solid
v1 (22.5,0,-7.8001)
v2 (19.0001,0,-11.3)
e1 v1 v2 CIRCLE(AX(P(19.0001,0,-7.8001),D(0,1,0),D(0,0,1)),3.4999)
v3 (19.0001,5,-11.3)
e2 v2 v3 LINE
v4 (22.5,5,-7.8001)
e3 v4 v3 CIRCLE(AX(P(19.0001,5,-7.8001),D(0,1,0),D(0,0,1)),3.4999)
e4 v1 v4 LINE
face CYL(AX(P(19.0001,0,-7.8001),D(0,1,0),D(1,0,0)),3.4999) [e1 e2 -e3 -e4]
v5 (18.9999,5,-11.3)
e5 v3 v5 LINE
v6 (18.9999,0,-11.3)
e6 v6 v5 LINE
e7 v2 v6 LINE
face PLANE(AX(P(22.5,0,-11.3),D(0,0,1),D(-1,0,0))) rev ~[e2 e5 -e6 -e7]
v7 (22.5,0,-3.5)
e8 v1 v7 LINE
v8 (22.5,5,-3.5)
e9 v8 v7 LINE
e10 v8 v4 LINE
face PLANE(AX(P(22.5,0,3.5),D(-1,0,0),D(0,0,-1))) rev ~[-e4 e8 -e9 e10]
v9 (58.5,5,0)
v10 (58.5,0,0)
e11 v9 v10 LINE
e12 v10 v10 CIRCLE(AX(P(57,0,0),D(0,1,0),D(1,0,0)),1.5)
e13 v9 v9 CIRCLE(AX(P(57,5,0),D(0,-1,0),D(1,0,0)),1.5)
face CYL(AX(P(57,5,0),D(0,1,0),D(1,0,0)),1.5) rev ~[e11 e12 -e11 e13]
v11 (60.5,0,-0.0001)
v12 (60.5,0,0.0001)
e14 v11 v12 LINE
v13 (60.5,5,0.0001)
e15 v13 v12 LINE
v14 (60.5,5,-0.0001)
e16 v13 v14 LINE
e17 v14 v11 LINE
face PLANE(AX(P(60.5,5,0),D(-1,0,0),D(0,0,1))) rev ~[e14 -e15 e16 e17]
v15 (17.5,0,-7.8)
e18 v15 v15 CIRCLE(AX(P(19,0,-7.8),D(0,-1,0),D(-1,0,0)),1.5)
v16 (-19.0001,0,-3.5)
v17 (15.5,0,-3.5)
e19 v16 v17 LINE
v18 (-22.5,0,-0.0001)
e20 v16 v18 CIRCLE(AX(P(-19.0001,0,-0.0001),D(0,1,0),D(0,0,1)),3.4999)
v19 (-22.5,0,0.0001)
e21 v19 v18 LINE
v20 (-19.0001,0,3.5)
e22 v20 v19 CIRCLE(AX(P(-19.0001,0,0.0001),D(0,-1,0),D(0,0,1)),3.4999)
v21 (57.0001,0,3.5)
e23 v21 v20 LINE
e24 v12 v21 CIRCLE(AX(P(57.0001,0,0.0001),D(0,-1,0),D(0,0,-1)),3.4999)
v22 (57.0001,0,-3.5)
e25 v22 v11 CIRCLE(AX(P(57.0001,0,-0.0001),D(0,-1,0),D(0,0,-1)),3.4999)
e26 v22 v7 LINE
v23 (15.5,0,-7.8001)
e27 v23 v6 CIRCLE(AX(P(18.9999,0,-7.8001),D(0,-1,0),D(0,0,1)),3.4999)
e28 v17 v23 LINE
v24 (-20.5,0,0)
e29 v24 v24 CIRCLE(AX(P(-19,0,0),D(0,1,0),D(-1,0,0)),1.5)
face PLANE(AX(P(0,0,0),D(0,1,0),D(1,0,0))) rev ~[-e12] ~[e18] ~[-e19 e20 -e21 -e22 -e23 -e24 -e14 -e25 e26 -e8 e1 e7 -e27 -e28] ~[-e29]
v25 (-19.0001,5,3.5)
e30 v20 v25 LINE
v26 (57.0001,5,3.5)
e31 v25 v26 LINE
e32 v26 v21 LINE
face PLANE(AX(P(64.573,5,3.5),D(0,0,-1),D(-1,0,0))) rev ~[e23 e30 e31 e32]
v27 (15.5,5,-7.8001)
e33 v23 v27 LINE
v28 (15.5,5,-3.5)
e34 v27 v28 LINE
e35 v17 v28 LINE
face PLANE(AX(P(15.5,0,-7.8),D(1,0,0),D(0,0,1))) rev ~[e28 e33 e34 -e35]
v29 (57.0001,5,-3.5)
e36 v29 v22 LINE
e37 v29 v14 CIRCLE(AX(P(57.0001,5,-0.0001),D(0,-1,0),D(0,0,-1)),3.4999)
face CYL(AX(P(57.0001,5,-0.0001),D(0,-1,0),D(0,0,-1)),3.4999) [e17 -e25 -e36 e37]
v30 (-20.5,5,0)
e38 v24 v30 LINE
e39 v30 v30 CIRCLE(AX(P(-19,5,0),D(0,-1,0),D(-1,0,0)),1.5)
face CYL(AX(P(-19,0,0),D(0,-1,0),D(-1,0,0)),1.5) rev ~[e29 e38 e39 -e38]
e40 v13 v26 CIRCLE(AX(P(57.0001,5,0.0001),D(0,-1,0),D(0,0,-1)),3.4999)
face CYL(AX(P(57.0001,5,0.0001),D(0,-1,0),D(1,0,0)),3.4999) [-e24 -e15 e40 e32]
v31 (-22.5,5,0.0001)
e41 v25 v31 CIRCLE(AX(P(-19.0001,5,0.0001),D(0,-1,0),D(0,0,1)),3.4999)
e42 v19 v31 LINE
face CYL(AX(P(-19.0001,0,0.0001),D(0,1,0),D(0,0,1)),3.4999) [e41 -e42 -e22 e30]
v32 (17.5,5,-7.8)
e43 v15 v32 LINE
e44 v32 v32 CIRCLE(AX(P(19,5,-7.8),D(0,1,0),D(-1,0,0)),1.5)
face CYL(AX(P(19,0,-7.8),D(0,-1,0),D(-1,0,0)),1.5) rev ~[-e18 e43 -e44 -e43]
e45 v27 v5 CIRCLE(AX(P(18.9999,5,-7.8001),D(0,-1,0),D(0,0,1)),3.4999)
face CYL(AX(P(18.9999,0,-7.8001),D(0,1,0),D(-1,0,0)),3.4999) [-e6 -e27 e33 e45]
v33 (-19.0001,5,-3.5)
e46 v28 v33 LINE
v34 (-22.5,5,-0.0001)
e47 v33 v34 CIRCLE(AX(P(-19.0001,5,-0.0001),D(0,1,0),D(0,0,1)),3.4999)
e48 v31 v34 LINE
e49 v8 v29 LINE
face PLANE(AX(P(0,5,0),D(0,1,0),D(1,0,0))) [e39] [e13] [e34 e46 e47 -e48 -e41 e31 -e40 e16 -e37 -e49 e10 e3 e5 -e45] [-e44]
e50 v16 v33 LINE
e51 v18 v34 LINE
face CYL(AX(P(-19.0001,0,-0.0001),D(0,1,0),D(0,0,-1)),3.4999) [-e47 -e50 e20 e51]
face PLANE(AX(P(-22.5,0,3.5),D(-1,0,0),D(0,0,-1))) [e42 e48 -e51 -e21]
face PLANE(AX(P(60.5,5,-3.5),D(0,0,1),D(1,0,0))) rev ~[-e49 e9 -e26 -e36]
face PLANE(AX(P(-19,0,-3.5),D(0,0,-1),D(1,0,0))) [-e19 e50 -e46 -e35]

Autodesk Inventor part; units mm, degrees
ref_plane "YZ Plane" through (0, 0, 0) normal (1, 0, 0) x (0, 1, 0)
ref_plane "XZ Plane" through (0, 0, 0) normal (0, 1, 0) x (-1, 0, 0)
ref_plane "XY Plane" through (0, 0, 0) normal (0, 0, 1) x (1, 0, 0)
sketch "Sketch1" plane through (0, 0, 0) normal (0, 1, 0) x (-1, 0, 0)
  line L0 (-19, -3.5) -> (-19, 3.5)
  line L1 (-19, 3.5) -> (19, 3.5)
  line L2 (19, 3.5) -> (19, -3.5)
  line L3 (19, -3.5) -> (-19, -3.5)
  line L4 (-19, -3.5) -> (19, 3.5) construction
  line L5 (-19, 3.5) -> (19, -3.5) construction
  circle A0 centre (19, 0) radius 1.5
  line L6 (19, 3.5) -> (22.5, 3.5)
  line L7 (22.5, 3.5) -> (22.5, -3.5)
  line L8 (22.5, -3.5) -> (19, -3.5)
  line L9 (19, -3.5) -> (19, 3.5)
  line L10 (-19, 0) -> (-19, -7.8)
  line L11 (-22.5, 14.8) -> (-22.5, -7.8)
  line L12 (-22.5, -7.8) -> (-15.5, -7.8)
  line L13 (-15.5, -7.8) -> (-15.5, 14.8)
  line L14 (-15.5, 14.8) -> (-22.5, 14.8)
  line L15 (-22.5, 14.8) -> (-15.5, -7.8) construction
  line L16 (-22.5, -7.8) -> (-15.5, 14.8) construction
  line L17 (-19, 3.5) -> (-22.5, 3.5)
  circle A1 centre (-19, -7.8) radius 1.5
  line L18 (-15.5, -7.8) -> (-22.5, -7.8)
  line L19 (-22.5, -7.8) -> (-22.5, -11.3)
  line L20 (-22.5, -11.3) -> (-15.5, -11.3)
  line L21 (-15.5, -11.3) -> (-15.5, -7.8)
  point P0 (0, 0)
  point P1 (-22.5, -7.8)
  point P2 (-15.5, -3.5)
  dimension "d0" = 7
  dimension "d1" = 38
  dimension "d2" = 3
  dimension "d3" = 3.5
  dimension "d4" = 7.8
  dimension "d5" = 7
  dimension "d6" = 3
  dimension "d7" = 3.5
extrude "Extrusion1" add sketch "Sketch1" along normal blind 5 contours L10 A1 L12 L11 L17 L0 | L0 L1 L13 L3 | L3 L13 L12 A1 L10 | L13 L1 L2 A0 L3 | L2 A0 L6 L7 L8 | L21 L20 L19 L12 A1
fillet "Fillet1" radius 3.5 5 edges at (22.5, 2.5, -11.3) (15.5, 2.5, -11.3) (22.5, 2.5, 3.5) (-22.5, 2.5, 3.5) (-22.5, 2.5, -3.5)
sketch "Sketch2" plane through (0, 5, 0) normal (0, 1, 0) x (1, 0, 0)
  arc A0 (19, -3.5) -> (22.5, 0) centre (19, 0) ccw projected
  line L0 (22.5, 0) -> (64, 0)
  line L1 (15.5, 3.5) -> (22.5, 3.5)
  line L2 (22.5, 3.5) -> (22.5, -3.5)
  line L3 (22.5, -3.5) -> (15.5, -3.5)
  line L4 (15.5, -3.5) -> (15.5, 3.5)
  line L5 (22.5, -3.5) -> (64, -3.5)
  line L6 (64, -3.5) -> (64, 3.5)
  line L7 (64, 3.5) -> (22.5, 3.5)
  line L8 (22.5, 3.5) -> (22.5, -3.5)
  line L9 (64, 3.5) -> (67.5, 3.5)
  line L10 (67.5, 3.5) -> (67.5, -3.5)
  line L11 (67.5, -3.5) -> (64, -3.5)
  line L12 (64, -3.5) -> (64, 3.5)
  circle A1 centre (64, 0) radius 1.65
  point P0 (0, 0)
  point P1 (22.5, 0)
  point P2 (19, -3.5)
  dimension "d11" = 41.5
  dimension "d12" = 3.5
  dimension "d13" = 3.3
extrude "Extrusion2" add sketch "Sketch2" against normal up to surface (5 mm away) contours A0 L2 L3 | L2 L7 L6 A1 L0 | L0 A1 L6 L5 L2 | L6 A1 L9 L10 L11
fillet "Fillet2" radius 3.5 2 edges at (67.5, 2.5, 3.5) (67.5, 2.5, -3.5)
sketch "Sketch3" plane through (0, 5, 0) normal (0, 1, 0) x (1, 0, 0)
  line L0 (19, 0) -> (57, 0)
  line L1 (19, 0) -> (60.5, 0)
  line L2 (19, 0) -> (60.5, 0) construction
  circle A0 centre (60.5, 0) radius 1.65
  point P0 (0, 0)
  dimension "d17" = 38
  dimension "d18" = 41.5
  dimension "d19" = 0
  dimension "d20" = 3.3
extrude "Extrusion3" cut sketch "Sketch3" against normal blind 10
sketch "Sketch4" plane through (0, 5, 0) normal (0, 1, 0) x (1, 0, 0)
  line L0 (-19, -3.5) -> (64, -3.5) projected
  line L1 (62.2745, -3.5) -> (67.2267, -3.5)
  line L2 (67.2267, -3.5) -> (67.2267, 3.993)
  line L3 (67.2267, 3.993) -> (62.2745, 3.993)
  line L4 (62.2745, 3.993) -> (62.2745, -3.5)
  line L5 (67.2267, 3.993) -> (67.8067, 3.993)
  line L6 (67.8067, 3.993) -> (67.8067, -3.5)
  line L7 (67.8067, -3.5) -> (67.2267, -3.5)
  line L8 (67.2267, -3.5) -> (67.2267, 3.993)
  point P0 (0, 0)
extrude "Extrusion4" cut sketch "Sketch4" against normal blind 10
sketch "Sketch5" plane through (0, 5, 0) normal (0, 1, 0) x (1, 0, 0)
  circle A0 centre (60.5, 0) radius 1.65 projected
  line L0 (60.5, 0) -> (64, 0)
  line L1 (-19, -3.5) -> (62.2745, -3.5) projected
  line L2 (60.5, -3.5) -> (64, -3.5)
  line L3 (64, -3.5) -> (64, 3.5)
  line L4 (64, 3.5) -> (60.5, 3.5)
  line L5 (60.5, 3.5) -> (60.5, -3.5)
  point P0 (0, 0)
  point P1 (60.5, 1.65)
  point P2 (60.5, -1.65)
  dimension "d25" = 3.5
  dimension "d26" = 7
extrude "Extrusion5" add sketch "Sketch5" against normal up to surface (5 mm away) contours L0 L3 L2 L1 L5 A0 | A0 L5 L4 L3 L0
fillet "Fillet3" radius 3.5 2 edges at (64, 2.5, 3.5) (64, 2.5, -3.5)
sketch "Sketch6" plane through (0, 5, 0) normal (0, 1, 0) x (1, 0, 0)
  circle A0 centre (19, 7.8) radius 1.5 projected
  line L0 (19, 7.8) -> (19, 0)
  circle A1 centre (-19, 0) radius 1.5 projected
  line L1 (19, 0) -> (-19, 0)
  line L2 (-19, 0) -> (19, 0)
  line L3 (19, 0) -> (57, 0)
  line L4 (60.5, 3.5) -> (22.5, 3.5) projected
  line L5 (57, 3.5) -> (64.573, 3.5)
  line L6 (64.573, 3.5) -> (64.573, -3.5)
  line L7 (64.573, -3.5) -> (57, -3.5)
  line L8 (57, -3.5) -> (57, 3.5)
  point P0 (0, 0)
  dimension "d30" = 38
extrude "Extrusion6" add sketch "Sketch6" against normal up to surface (5 mm away) contours L5 L6 L7 L8 L4
sketch "Sketch7" plane through (0, 5, 0) normal (0, 1, 0) x (1, 0, 0)
  circle A0 centre (19, 7.8) radius 1.5 projected
  line L0 (19, 7.8) -> (19, 0)
  line L1 (19, 0) -> (57, 0)
  circle A1 centre (57, 0) radius 1.5
  line L2 (57, 0) -> (60.5, 0)
  line L3 (-19, -3.5) -> (64.573, -3.5) projected
  line L4 (64.573, 3.5) -> (22.5, 3.5) projected
  line L5 (60.5, -3.5) -> (64.573, -3.5)
  line L6 (64.573, -3.5) -> (64.573, 3.5)
  line L7 (64.573, 3.5) -> (60.5, 3.5)
  line L8 (60.5, 3.5) -> (60.5, -3.5)
  point P0 (0, 0)
  point P1 (64.573, -3.5)
  dimension "d33" = 7.8
  dimension "d34" = 38
  dimension "d35" = 3
  dimension "d36" = 3.5
extrude "Extrusion7" cut sketch "Sketch7" against normal blind 10 contours A1 L2 L1 | L1 L2 A1 | L8 L4 L6 L3
fillet "Fillet4" radius 3.5 2 edges at (60.5, 2.5, -3.5) (60.5, 2.5, 3.5)
properties part number "connector"
